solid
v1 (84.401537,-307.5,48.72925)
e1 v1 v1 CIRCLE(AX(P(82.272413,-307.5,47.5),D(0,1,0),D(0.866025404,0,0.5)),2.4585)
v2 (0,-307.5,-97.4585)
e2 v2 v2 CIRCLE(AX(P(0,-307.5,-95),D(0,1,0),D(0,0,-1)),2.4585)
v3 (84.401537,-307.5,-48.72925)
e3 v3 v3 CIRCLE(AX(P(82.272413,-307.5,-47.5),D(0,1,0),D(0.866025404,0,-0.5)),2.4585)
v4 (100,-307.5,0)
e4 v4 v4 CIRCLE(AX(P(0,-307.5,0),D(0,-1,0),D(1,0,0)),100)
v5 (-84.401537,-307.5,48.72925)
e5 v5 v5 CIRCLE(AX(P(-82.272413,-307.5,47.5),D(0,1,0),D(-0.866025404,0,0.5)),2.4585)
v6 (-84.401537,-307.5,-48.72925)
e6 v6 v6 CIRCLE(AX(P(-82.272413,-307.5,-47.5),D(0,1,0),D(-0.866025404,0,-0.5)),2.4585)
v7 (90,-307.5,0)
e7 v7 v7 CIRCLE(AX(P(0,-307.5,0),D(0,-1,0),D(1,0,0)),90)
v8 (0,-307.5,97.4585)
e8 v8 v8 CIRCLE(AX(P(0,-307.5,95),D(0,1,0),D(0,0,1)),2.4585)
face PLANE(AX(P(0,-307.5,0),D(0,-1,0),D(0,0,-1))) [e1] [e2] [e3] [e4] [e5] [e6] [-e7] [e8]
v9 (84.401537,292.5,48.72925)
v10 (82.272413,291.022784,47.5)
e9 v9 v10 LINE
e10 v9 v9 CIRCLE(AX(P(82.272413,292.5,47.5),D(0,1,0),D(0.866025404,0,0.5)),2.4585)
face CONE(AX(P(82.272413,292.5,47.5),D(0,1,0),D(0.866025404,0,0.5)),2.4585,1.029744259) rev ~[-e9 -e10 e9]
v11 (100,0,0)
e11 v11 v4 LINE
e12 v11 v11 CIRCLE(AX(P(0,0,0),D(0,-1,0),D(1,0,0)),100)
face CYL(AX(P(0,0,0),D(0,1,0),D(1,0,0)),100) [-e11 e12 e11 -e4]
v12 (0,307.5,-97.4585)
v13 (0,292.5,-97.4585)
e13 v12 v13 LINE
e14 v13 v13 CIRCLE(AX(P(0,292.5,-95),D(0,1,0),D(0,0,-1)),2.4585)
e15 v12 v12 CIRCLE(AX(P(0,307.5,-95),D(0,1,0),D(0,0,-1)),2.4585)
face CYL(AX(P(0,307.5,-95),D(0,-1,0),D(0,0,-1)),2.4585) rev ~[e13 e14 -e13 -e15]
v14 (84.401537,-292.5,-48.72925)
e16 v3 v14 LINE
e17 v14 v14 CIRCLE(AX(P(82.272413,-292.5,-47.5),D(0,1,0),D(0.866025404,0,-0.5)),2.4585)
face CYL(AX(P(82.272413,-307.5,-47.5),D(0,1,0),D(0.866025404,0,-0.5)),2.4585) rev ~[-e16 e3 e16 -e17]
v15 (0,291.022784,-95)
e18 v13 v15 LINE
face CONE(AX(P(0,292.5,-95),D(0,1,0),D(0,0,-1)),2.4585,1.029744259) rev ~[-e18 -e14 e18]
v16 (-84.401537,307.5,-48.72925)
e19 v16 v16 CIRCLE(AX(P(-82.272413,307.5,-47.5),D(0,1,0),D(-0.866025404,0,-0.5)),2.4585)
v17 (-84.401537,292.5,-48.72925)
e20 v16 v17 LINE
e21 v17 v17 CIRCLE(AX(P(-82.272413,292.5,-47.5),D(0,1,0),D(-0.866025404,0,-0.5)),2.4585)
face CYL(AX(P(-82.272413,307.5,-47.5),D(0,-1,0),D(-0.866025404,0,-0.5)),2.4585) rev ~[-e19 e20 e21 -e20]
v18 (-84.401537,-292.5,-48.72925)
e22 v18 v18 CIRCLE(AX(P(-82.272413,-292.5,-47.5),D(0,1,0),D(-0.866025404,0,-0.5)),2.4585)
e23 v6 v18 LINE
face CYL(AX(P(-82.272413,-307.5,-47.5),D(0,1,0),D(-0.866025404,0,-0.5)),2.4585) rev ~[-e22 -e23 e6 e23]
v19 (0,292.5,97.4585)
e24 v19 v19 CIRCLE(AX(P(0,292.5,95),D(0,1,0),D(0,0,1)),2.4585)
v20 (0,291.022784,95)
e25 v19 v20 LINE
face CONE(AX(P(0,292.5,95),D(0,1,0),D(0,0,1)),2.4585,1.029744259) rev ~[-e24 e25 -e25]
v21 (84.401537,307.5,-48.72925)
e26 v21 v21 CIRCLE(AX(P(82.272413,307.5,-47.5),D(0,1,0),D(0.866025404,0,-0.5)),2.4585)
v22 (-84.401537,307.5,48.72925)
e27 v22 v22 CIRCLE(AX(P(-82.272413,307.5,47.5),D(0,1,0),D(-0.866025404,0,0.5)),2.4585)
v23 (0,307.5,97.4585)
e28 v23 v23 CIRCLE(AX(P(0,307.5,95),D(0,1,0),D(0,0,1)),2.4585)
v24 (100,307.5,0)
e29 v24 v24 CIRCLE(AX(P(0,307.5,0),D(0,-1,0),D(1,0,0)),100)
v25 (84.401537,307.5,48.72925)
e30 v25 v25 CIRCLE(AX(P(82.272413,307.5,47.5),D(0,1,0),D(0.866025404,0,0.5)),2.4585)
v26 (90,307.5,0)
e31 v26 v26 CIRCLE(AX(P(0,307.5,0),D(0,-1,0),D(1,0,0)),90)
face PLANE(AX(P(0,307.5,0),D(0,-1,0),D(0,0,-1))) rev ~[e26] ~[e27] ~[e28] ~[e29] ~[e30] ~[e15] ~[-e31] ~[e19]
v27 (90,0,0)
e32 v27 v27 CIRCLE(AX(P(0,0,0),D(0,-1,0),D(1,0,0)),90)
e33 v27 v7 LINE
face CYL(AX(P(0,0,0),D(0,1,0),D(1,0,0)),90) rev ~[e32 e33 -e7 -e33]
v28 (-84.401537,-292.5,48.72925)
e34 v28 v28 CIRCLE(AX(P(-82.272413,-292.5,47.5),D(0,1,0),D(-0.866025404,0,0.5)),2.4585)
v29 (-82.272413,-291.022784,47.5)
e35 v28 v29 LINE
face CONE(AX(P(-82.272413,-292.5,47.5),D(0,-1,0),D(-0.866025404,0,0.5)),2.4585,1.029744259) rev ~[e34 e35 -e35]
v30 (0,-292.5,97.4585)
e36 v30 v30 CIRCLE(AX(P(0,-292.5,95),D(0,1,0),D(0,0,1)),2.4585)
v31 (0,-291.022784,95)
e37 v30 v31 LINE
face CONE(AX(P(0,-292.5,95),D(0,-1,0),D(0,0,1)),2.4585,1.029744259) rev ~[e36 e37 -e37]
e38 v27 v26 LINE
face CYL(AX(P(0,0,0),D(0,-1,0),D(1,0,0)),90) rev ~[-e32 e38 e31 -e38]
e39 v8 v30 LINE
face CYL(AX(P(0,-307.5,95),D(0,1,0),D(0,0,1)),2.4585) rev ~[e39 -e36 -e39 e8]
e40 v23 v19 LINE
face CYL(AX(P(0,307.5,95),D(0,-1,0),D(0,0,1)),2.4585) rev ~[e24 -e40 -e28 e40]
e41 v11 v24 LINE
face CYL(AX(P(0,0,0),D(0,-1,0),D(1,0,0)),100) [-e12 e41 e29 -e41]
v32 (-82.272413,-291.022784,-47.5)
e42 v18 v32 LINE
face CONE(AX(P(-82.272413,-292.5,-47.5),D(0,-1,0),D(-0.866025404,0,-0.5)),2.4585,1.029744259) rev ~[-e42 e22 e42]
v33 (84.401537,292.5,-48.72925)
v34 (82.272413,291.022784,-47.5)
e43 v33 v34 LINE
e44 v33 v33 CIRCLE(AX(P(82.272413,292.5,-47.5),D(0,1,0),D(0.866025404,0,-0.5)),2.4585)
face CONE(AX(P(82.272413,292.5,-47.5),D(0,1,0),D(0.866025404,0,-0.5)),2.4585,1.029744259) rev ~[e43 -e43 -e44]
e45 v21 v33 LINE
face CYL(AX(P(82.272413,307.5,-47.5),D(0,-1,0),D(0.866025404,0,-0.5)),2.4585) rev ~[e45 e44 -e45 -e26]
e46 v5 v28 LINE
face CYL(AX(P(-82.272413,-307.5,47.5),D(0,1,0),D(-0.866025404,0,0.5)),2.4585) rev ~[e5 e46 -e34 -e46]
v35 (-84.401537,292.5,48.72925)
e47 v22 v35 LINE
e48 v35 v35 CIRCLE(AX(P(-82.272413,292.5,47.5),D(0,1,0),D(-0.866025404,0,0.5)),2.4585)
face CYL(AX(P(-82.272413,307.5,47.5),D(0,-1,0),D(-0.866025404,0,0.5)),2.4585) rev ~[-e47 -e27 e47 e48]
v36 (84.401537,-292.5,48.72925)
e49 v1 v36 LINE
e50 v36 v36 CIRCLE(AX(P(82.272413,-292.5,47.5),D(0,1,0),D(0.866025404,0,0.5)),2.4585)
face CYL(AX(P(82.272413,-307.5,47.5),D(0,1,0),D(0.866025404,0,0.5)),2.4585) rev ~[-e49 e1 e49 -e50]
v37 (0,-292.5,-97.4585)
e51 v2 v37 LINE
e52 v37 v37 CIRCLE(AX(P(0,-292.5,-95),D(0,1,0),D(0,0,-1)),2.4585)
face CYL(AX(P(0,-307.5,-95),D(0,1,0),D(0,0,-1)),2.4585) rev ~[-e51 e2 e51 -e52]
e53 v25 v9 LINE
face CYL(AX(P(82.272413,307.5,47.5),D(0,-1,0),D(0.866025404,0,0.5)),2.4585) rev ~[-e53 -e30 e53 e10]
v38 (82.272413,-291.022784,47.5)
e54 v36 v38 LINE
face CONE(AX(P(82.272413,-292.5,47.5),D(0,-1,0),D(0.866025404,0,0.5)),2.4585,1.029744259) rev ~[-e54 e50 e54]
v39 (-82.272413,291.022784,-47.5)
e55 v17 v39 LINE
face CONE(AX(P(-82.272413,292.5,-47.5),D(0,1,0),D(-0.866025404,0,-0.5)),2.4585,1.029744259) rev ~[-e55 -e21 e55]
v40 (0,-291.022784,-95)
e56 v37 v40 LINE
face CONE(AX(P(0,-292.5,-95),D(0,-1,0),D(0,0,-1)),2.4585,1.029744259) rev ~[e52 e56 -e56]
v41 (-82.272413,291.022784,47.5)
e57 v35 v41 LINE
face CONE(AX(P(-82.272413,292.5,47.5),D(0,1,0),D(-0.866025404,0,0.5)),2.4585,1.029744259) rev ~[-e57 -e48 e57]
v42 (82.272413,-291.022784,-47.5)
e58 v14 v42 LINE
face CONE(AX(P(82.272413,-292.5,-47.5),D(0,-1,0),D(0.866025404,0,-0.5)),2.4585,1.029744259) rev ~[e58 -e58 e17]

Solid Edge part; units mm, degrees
sketch "Sketch1" plane through (0, 0, 0) normal (0, -1, 0) x (1, 0, 0)
  circle A0 centre (0, 0) radius 100
  circle A1 centre (0, 0) radius 90
  dimension "D1" = 200
  dimension "D2" = 10
  dimension "D3" = 180
extrude "Protrusion1" add sketch "Sketch1" along normal mid plane 615
hole "Bohrung_1" at (0, -307.5, -95) direction (0, 1, 0) diameter 4.917 depth 15 tip angle 118 thread major 6 thread length 12
pattern_circular "Pattern1" count 6 over 360 about axis through (0, -307.5, 0) along (0, 1, 0) of "Bohrung_1"
mirror "Mirror1" about plane through (0, 0, 0) normal (0, -1, 0) of "Bohrung_1", "Pattern1"
extrude "Cutout1" [suppressed]
fillet "Round_1" [suppressed]
properties material "Aluminium"
